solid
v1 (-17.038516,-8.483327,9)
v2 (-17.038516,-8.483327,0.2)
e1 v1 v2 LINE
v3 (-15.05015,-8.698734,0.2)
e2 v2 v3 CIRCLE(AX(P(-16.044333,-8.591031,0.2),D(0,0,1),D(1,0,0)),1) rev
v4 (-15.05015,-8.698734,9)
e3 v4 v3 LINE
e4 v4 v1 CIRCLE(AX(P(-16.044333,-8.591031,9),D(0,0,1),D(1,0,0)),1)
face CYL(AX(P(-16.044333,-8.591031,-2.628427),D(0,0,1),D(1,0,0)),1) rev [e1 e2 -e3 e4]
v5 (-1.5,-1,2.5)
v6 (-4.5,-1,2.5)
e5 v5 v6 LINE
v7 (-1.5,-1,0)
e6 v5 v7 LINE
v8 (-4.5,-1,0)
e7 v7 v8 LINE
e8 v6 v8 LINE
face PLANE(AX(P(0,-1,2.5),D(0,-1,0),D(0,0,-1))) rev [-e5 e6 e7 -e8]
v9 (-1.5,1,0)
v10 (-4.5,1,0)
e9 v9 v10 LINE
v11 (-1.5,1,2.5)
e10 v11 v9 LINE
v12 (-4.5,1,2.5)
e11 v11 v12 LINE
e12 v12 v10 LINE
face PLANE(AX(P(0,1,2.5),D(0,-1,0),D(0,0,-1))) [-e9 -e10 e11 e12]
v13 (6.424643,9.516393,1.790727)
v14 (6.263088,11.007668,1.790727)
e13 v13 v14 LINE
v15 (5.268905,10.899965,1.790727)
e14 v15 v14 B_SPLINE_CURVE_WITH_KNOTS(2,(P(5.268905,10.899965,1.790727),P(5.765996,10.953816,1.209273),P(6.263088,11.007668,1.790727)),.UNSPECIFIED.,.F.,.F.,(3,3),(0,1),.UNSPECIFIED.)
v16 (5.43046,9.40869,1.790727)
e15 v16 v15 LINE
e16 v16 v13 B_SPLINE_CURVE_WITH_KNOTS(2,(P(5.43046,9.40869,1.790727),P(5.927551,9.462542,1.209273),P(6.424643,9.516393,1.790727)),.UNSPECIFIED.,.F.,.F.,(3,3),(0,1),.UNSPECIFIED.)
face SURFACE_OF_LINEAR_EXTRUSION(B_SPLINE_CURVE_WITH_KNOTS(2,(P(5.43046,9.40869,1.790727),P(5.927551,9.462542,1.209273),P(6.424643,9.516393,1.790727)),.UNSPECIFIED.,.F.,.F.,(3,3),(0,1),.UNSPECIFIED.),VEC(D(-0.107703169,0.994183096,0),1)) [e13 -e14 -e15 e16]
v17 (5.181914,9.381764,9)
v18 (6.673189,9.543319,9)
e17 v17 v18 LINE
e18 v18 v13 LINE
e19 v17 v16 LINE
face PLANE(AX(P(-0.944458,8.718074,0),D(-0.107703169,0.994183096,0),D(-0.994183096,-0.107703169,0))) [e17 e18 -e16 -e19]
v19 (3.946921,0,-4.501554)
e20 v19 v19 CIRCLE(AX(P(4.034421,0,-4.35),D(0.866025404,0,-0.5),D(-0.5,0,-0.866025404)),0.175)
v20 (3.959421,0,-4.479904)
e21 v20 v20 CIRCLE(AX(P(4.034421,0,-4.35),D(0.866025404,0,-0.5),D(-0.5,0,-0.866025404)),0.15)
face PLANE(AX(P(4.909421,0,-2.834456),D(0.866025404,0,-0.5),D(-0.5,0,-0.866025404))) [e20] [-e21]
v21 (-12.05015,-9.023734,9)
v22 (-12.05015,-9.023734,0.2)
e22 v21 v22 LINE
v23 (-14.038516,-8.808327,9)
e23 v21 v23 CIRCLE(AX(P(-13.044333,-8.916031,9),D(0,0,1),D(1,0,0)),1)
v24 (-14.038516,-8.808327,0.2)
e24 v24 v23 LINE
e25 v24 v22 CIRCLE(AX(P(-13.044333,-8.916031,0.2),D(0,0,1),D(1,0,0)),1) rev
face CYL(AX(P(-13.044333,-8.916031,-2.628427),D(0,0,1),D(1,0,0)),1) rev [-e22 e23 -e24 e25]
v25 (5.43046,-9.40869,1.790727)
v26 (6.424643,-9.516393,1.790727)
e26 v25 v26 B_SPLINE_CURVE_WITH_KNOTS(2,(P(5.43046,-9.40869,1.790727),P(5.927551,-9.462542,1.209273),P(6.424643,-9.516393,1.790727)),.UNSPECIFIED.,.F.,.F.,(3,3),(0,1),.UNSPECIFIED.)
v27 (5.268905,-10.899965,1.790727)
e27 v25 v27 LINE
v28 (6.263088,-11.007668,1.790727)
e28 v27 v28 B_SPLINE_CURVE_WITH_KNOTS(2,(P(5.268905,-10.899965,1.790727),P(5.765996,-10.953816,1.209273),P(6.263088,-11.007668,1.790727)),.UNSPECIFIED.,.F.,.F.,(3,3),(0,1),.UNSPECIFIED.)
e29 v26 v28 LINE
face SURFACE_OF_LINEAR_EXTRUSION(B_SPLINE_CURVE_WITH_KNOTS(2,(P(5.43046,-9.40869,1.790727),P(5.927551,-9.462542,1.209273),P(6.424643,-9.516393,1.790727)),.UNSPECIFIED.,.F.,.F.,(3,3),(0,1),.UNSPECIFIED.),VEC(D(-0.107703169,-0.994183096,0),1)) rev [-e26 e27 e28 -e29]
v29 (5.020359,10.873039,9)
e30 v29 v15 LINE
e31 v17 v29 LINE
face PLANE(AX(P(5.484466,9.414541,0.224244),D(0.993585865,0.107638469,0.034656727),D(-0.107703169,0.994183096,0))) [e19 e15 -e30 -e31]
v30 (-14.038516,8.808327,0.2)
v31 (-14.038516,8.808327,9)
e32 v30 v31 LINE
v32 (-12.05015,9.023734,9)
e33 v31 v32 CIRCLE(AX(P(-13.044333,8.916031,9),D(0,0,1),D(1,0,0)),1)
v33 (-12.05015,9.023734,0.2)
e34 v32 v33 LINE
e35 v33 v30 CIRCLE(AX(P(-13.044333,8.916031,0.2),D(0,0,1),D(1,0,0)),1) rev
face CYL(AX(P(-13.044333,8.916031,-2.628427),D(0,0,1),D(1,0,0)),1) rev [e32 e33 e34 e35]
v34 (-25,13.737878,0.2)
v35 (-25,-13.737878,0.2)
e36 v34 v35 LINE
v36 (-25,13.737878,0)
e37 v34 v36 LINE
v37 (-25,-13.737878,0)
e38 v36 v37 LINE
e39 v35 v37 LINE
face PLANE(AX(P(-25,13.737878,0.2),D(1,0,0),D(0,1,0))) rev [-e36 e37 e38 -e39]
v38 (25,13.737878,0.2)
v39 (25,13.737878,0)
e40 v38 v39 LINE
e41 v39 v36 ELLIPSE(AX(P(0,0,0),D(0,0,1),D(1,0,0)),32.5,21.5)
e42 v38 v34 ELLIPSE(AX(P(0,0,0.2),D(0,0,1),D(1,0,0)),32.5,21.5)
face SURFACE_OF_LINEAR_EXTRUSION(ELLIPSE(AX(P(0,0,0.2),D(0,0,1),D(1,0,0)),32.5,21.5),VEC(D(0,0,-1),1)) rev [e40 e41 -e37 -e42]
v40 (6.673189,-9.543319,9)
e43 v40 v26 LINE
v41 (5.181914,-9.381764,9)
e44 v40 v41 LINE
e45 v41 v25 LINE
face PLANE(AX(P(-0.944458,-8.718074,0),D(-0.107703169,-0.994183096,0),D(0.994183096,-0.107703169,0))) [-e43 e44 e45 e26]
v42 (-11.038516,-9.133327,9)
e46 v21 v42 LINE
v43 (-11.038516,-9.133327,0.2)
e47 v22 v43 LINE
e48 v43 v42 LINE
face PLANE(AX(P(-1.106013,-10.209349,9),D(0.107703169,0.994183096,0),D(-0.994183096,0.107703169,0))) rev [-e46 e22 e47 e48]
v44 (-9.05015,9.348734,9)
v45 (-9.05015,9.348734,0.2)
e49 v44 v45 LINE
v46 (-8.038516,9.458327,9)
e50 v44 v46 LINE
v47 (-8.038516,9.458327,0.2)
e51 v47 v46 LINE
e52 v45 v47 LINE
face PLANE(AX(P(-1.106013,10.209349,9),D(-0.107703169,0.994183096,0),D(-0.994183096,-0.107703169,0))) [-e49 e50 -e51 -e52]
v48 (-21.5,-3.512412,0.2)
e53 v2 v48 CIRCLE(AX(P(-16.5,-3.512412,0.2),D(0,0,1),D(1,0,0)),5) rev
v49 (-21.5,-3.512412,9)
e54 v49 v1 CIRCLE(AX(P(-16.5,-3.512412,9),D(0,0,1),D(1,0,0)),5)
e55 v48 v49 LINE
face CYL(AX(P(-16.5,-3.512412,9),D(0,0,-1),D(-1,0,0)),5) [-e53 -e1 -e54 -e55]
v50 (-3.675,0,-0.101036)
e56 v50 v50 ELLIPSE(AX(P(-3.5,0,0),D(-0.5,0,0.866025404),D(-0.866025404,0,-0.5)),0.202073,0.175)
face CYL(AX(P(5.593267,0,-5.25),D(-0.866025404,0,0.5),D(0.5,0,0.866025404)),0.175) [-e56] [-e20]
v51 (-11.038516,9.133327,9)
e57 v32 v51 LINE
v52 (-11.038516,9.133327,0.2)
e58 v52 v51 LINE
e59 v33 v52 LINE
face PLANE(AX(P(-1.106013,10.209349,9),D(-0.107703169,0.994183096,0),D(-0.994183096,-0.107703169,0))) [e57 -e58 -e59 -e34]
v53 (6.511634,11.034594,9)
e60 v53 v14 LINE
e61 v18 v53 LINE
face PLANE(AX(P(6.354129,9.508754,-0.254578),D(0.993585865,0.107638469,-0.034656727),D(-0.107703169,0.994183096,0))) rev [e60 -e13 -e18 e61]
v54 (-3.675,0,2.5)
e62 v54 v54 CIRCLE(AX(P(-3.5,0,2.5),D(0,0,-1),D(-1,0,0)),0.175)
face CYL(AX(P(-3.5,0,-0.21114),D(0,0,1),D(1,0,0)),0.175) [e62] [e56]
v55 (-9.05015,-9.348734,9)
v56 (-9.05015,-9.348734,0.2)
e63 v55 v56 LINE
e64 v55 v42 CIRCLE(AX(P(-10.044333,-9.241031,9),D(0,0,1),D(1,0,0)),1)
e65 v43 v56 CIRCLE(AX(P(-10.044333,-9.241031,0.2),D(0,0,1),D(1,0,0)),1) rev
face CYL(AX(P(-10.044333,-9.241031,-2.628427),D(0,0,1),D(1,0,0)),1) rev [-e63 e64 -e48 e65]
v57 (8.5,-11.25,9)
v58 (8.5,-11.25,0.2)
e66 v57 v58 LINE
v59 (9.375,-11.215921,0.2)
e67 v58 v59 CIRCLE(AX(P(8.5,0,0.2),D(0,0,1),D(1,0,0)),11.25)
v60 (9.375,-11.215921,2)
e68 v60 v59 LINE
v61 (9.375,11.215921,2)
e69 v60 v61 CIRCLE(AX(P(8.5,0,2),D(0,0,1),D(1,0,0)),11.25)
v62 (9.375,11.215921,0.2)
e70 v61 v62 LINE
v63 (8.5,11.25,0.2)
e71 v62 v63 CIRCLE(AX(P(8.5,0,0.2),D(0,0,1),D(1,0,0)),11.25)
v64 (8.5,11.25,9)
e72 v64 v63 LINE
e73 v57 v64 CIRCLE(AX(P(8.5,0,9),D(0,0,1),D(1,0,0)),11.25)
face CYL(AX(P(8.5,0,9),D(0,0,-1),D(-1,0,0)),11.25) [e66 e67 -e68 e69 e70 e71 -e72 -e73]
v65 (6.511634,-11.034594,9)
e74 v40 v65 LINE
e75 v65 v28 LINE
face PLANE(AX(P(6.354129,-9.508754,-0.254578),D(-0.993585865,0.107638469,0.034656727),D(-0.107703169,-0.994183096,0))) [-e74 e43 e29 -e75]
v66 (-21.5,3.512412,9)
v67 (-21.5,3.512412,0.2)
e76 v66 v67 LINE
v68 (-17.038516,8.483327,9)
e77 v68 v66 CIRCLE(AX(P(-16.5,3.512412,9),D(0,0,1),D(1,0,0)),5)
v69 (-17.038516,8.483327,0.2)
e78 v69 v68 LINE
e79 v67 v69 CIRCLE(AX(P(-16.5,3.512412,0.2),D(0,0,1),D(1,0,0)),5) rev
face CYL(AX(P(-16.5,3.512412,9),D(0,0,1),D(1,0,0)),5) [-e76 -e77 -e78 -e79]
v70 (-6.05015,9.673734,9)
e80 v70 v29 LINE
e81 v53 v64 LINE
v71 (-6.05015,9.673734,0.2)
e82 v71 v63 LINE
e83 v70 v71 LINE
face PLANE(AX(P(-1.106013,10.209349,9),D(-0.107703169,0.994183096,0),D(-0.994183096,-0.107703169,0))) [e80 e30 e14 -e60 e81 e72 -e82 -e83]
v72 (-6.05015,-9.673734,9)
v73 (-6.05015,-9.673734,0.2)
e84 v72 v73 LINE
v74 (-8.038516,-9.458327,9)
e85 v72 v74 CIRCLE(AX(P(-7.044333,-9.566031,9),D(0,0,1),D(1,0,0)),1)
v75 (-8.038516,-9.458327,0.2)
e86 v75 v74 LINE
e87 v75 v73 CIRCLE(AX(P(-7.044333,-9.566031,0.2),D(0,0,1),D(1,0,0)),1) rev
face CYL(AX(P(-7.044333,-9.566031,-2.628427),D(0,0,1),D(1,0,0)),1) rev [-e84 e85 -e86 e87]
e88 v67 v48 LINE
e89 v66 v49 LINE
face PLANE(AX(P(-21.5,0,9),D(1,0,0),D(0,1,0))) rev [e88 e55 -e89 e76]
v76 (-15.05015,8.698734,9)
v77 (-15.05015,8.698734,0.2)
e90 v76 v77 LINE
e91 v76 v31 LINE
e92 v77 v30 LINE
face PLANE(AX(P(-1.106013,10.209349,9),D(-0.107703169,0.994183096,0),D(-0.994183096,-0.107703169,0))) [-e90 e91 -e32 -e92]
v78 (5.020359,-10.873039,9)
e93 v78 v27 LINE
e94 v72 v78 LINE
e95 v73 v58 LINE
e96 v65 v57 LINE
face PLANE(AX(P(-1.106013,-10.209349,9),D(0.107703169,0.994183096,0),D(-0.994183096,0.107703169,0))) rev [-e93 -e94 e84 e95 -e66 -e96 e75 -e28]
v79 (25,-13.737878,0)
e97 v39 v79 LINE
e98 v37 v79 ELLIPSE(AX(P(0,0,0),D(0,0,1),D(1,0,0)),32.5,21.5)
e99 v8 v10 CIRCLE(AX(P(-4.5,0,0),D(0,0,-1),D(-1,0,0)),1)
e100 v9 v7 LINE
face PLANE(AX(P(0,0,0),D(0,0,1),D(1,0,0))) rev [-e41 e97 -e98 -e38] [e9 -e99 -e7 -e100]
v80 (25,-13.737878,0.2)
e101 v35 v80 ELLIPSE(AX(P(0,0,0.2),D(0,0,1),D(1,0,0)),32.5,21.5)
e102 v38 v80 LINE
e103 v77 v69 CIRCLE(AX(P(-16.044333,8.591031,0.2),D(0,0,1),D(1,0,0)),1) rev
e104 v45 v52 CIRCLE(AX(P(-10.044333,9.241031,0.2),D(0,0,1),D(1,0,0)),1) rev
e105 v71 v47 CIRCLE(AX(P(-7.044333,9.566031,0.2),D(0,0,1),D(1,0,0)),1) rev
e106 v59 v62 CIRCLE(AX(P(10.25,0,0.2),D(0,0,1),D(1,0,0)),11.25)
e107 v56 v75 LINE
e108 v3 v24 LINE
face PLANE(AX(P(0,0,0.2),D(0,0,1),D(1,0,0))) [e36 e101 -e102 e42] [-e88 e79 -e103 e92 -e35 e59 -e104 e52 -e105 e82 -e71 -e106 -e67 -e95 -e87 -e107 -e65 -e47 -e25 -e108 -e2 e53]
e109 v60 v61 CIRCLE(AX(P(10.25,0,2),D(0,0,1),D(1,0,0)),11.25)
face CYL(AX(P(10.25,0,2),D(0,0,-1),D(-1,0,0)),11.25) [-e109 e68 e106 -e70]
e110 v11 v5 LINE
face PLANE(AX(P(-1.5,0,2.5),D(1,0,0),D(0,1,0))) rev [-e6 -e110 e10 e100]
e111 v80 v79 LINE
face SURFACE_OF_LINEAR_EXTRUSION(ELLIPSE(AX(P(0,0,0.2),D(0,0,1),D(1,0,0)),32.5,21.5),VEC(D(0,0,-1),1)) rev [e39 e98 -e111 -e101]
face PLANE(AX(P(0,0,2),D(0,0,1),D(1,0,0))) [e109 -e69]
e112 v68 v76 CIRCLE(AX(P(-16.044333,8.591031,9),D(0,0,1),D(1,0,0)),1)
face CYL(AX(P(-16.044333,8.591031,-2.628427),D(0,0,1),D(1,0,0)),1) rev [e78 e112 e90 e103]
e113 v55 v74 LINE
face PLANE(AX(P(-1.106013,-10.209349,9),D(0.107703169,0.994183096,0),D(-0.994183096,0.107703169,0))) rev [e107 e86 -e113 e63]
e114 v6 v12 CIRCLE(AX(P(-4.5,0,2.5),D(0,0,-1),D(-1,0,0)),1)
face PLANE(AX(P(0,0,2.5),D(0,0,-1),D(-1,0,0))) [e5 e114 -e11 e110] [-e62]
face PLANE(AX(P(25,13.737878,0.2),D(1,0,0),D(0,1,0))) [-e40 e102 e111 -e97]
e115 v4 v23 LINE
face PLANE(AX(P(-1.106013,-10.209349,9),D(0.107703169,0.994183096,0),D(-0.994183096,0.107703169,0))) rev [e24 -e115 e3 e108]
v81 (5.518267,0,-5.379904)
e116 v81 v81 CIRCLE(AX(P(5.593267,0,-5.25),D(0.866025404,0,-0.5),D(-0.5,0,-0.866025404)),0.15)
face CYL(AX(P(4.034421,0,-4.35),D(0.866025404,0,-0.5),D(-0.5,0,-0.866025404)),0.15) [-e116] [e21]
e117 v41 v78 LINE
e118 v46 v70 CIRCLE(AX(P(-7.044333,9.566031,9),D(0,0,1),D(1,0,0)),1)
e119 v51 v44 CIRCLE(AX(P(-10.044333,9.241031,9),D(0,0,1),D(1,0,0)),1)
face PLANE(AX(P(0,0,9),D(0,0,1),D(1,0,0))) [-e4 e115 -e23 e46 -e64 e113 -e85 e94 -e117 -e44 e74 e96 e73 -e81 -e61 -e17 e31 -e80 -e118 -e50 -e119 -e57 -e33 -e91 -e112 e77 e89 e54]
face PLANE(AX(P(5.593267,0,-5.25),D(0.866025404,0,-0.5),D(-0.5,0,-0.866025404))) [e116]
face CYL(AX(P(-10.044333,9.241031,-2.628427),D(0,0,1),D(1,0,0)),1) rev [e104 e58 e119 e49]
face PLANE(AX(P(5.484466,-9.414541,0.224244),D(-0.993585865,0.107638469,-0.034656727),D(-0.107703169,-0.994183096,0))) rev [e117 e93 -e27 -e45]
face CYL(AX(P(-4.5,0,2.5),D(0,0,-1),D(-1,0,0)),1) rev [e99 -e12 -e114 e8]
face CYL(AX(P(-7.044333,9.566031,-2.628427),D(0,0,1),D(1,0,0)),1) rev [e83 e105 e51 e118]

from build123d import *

# Parameters (mm, degrees)
SENSOR_HEIGHT_DEPTH               = 9
SENSOR_LIP_HEIGHT_DEPTH           = 2
SHORT_SIDE_EDGE_ROUNDING_R        = 5
PATCH_DEPTH                       = 0.2
SENSOR_HOLES_R                    = 1
EXTRUDED_SENSOR_HOLES_DEPTH       = 8.8
BOTTOM_TRIANGLE_CUT_DEPTH         = 1.5
TOP_TRIANGLE_CUT_DEPTH            = 1.5
FILAMENT_HOLE_CUT_DEPTH           = 2.5
FILAMENT_PROFILE_R                = 0.175
SENSING_START                     = -1.8
SENSING_FILAMENT_R                = 0.175
SENSING_FILAMENT_R_2              = 0.15
SENSING_PORTION_OF_FILAMENT_DEPTH = 1.8


# Read off the part's stored shape, not the designer's step: Sensor Lip Height
with BuildPart() as part:
    # Basic Sensor Dimensions → Sensor Height (new body)
    with BuildSketch(Plane.XY):
        with BuildLine():
            Line((-21.5, 8), (-21.5, -8))
            Line((-21.5, -8), (8.5, -11.25))
            ThreePointArc((8.5, -11.25), (19.75, 0), (8.5, 11.25))
            Line((8.5, 11.25), (-21.5, 8))
        make_face()
    extrude(amount=SENSOR_HEIGHT_DEPTH)

    # Sensor Lip Height outline → Sensor Lip Height (add)
    with BuildSketch(Plane.XY):
        with BuildLine():
            ThreePointArc((9.375, -11.215920604), (21.5, 0), (9.375, 11.215920604))
            ThreePointArc((9.375, 11.215920604), (19.75, 0), (9.375, -11.215920604))
        make_face()
    extrude(amount=SENSOR_LIP_HEIGHT_DEPTH)

    # Short Side Edge Rounding
    short_side_edge_rounding_edges = [part.edges().sort_by_distance(p)[0] for p in [
        (-21.5, -8, 4.5),
        (-21.5, 8, 4.5),
    ]]
    fillet(short_side_edge_rounding_edges, radius=SHORT_SIDE_EDGE_ROUNDING_R)

    # Basic Sensor Dimensions<7> → Patch (add)
    with BuildSketch(Plane.XY):
        with BuildLine():
            Line((25, 13.737877927), (25, -13.737877927))
            add(Edge.make_bspline(
                [(-25, -13.737877927), (0, -33.647845937), (25, -13.737877927)],
                knots=[3.834752561, 3.834752561, 3.834752561, 5.5900254, 5.5900254, 5.5900254], degree=2, weights=[1, 0.638971066, 1]))
            Line((-25, -13.737877927), (-25, 13.737877927))
            add(Edge.make_bspline(
                [(25, 13.737877927), (0, 33.647845937), (-25, 13.737877927)],
                knots=[0.693159908, 0.693159908, 0.693159908, 2.448432746, 2.448432746, 2.448432746], degree=2, weights=[1, 0.638971066, 1]))
        make_face()
    extrude(amount=PATCH_DEPTH)

    # Sensor Holes → Extruded Sensor Holes (cut)
    with BuildSketch(Plane.XY.offset(9)):
        with Locations((-16.044332748, -8.591030619)):
            Circle(SENSOR_HOLES_R)
        with Locations((-13.044332748, -8.916030619)):
            Circle(SENSOR_HOLES_R)
        with Locations((-10.044332748, -9.241030619)):
            Circle(SENSOR_HOLES_R)
        with Locations((-7.044332748, -9.566030619)):
            Circle(SENSOR_HOLES_R)
        with Locations((-10.044332748, 9.241030619)):
            Circle(SENSOR_HOLES_R)
        with Locations((-7.044332748, 9.566030619)):
            Circle(SENSOR_HOLES_R)
        with Locations((-13.044332748, 8.916030619)):
            Circle(SENSOR_HOLES_R)
        with Locations((-16.044332748, 8.591030619)):
            Circle(SENSOR_HOLES_R)
    extrude(amount=-EXTRUDED_SENSOR_HOLES_DEPTH, mode=Mode.SUBTRACT)

    # Bottom Triangle → Bottom Triangle Cut (cut)
    with BuildSketch(Plane(origin=(-1.106012767, -10.209348617, 0), x_dir=(0.9941830955390242, -0.10770316868339427, 0), z_dir=(-0.10770316868339427, -0.9941830955390242, 0))):
        with BuildLine():
            Line((6.91221696, 1.5), (6.91221696, 9))
            Line((6.91221696, 9), (6.16221696, 9))
            Line((6.16221696, 9), (6.41221696, 1.790726708))
            add(Edge.make_bspline(
                [(6.41221696, 1.790726708), (6.66221696, 1.5), (6.91221696, 1.5)],
                knots=[0, 0, 0, 0.5, 0.5, 0.5], degree=2))
        make_face()
        with BuildLine():
            Line((7.41221696, 1.790726708), (7.66221696, 9))
            Line((7.66221696, 9), (6.91221696, 9))
            Line((6.91221696, 9), (6.91221696, 1.5))
            add(Edge.make_bspline(
                [(6.91221696, 1.5), (7.16221696, 1.5), (7.41221696, 1.790726708)],
                knots=[0.5, 0.5, 0.5, 1, 1, 1], degree=2))
        make_face()
    extrude(amount=-BOTTOM_TRIANGLE_CUT_DEPTH, mode=Mode.SUBTRACT)

    # Top Triangle → Top Triangle Cut (cut)
    with BuildSketch(Plane(origin=(-1.106012767, 10.209348617, 0), x_dir=(0.9941830955390242, 0.10770316868339432, 0), z_dir=(-0.10770316868339432, 0.9941830955390242, 0))):
        with BuildLine():
            Line((6.91221696, -9), (7.66221696, -9))
            Line((7.66221696, -9), (7.41221696, -1.790726708))
            add(Edge.make_bspline(
                [(6.91221696, -1.5), (7.16221696, -1.5), (7.41221696, -1.790726708)],
                knots=[0.5, 0.5, 0.5, 1, 1, 1], degree=2))
            Line((6.91221696, -1.5), (6.91221696, -9))
        make_face()
        with BuildLine():
            Line((6.16221696, -9), (6.91221696, -9))
            Line((6.91221696, -9), (6.91221696, -1.5))
            add(Edge.make_bspline(
                [(6.41221696, -1.790726708), (6.66221696, -1.5), (6.91221696, -1.5)],
                knots=[0, 0, 0, 0.5, 0.5, 0.5], degree=2))
            Line((6.41221696, -1.790726708), (6.16221696, -9))
        make_face()
    extrude(amount=-TOP_TRIANGLE_CUT_DEPTH, mode=Mode.SUBTRACT)

    # Filament Hole → Filament Hole Cut (cut)
    with BuildSketch(Plane(origin=(0, 0, 0), x_dir=(-1, 0, 0), z_dir=(0, 0, -1))):
        with BuildLine():
            Line((4.5, 1), (1.5, 1))
            Line((1.5, 1), (1.5, -1))
            Line((1.5, -1), (4.5, -1))
            ThreePointArc((4.5, -1), (5.5, 0), (4.5, 1))
        make_face()
    extrude(amount=-FILAMENT_HOLE_CUT_DEPTH, mode=Mode.SUBTRACT)

    # Filament: sweep along a curve in space
    with BuildLine() as filament_path:
        Line((-3.5, 0, 0), (-3.5, 0, 2.5))
        Line((-3.5, 0, 0), (5.59326674, 0, -5.25))
    # Filament profile (on start of the path) → Filament (sweep)
    with BuildSketch(Plane(origin=(5.59326674, 0, -5.25), x_dir=(-0.500000000000001, 0, -0.866025403784438), z_dir=(-0.866025403784438, -1.4044495267806857e-15, 0.500000000000001))):
        Circle(FILAMENT_PROFILE_R)
    sweep(path=filament_path.line, transition=Transition.RIGHT)

    # Sensing Filament → Sensing Portion of Filament (cut)
    with BuildSketch(Plane(origin=(6.46826674, 0, -3.734455543), x_dir=(-0.500000000000001, 0, -0.866025403784438), z_dir=(0.866025403784438, 1.066393786355781e-15, -0.500000000000001)).offset(SENSING_START)):
        with Locations((1.75, 0)):
            Circle(SENSING_FILAMENT_R)
        with Locations((1.75, 0)):
            Circle(SENSING_FILAMENT_R_2, mode=Mode.SUBTRACT)
    extrude(amount=SENSING_PORTION_OF_FILAMENT_DEPTH, mode=Mode.SUBTRACT)


solid = part.part
